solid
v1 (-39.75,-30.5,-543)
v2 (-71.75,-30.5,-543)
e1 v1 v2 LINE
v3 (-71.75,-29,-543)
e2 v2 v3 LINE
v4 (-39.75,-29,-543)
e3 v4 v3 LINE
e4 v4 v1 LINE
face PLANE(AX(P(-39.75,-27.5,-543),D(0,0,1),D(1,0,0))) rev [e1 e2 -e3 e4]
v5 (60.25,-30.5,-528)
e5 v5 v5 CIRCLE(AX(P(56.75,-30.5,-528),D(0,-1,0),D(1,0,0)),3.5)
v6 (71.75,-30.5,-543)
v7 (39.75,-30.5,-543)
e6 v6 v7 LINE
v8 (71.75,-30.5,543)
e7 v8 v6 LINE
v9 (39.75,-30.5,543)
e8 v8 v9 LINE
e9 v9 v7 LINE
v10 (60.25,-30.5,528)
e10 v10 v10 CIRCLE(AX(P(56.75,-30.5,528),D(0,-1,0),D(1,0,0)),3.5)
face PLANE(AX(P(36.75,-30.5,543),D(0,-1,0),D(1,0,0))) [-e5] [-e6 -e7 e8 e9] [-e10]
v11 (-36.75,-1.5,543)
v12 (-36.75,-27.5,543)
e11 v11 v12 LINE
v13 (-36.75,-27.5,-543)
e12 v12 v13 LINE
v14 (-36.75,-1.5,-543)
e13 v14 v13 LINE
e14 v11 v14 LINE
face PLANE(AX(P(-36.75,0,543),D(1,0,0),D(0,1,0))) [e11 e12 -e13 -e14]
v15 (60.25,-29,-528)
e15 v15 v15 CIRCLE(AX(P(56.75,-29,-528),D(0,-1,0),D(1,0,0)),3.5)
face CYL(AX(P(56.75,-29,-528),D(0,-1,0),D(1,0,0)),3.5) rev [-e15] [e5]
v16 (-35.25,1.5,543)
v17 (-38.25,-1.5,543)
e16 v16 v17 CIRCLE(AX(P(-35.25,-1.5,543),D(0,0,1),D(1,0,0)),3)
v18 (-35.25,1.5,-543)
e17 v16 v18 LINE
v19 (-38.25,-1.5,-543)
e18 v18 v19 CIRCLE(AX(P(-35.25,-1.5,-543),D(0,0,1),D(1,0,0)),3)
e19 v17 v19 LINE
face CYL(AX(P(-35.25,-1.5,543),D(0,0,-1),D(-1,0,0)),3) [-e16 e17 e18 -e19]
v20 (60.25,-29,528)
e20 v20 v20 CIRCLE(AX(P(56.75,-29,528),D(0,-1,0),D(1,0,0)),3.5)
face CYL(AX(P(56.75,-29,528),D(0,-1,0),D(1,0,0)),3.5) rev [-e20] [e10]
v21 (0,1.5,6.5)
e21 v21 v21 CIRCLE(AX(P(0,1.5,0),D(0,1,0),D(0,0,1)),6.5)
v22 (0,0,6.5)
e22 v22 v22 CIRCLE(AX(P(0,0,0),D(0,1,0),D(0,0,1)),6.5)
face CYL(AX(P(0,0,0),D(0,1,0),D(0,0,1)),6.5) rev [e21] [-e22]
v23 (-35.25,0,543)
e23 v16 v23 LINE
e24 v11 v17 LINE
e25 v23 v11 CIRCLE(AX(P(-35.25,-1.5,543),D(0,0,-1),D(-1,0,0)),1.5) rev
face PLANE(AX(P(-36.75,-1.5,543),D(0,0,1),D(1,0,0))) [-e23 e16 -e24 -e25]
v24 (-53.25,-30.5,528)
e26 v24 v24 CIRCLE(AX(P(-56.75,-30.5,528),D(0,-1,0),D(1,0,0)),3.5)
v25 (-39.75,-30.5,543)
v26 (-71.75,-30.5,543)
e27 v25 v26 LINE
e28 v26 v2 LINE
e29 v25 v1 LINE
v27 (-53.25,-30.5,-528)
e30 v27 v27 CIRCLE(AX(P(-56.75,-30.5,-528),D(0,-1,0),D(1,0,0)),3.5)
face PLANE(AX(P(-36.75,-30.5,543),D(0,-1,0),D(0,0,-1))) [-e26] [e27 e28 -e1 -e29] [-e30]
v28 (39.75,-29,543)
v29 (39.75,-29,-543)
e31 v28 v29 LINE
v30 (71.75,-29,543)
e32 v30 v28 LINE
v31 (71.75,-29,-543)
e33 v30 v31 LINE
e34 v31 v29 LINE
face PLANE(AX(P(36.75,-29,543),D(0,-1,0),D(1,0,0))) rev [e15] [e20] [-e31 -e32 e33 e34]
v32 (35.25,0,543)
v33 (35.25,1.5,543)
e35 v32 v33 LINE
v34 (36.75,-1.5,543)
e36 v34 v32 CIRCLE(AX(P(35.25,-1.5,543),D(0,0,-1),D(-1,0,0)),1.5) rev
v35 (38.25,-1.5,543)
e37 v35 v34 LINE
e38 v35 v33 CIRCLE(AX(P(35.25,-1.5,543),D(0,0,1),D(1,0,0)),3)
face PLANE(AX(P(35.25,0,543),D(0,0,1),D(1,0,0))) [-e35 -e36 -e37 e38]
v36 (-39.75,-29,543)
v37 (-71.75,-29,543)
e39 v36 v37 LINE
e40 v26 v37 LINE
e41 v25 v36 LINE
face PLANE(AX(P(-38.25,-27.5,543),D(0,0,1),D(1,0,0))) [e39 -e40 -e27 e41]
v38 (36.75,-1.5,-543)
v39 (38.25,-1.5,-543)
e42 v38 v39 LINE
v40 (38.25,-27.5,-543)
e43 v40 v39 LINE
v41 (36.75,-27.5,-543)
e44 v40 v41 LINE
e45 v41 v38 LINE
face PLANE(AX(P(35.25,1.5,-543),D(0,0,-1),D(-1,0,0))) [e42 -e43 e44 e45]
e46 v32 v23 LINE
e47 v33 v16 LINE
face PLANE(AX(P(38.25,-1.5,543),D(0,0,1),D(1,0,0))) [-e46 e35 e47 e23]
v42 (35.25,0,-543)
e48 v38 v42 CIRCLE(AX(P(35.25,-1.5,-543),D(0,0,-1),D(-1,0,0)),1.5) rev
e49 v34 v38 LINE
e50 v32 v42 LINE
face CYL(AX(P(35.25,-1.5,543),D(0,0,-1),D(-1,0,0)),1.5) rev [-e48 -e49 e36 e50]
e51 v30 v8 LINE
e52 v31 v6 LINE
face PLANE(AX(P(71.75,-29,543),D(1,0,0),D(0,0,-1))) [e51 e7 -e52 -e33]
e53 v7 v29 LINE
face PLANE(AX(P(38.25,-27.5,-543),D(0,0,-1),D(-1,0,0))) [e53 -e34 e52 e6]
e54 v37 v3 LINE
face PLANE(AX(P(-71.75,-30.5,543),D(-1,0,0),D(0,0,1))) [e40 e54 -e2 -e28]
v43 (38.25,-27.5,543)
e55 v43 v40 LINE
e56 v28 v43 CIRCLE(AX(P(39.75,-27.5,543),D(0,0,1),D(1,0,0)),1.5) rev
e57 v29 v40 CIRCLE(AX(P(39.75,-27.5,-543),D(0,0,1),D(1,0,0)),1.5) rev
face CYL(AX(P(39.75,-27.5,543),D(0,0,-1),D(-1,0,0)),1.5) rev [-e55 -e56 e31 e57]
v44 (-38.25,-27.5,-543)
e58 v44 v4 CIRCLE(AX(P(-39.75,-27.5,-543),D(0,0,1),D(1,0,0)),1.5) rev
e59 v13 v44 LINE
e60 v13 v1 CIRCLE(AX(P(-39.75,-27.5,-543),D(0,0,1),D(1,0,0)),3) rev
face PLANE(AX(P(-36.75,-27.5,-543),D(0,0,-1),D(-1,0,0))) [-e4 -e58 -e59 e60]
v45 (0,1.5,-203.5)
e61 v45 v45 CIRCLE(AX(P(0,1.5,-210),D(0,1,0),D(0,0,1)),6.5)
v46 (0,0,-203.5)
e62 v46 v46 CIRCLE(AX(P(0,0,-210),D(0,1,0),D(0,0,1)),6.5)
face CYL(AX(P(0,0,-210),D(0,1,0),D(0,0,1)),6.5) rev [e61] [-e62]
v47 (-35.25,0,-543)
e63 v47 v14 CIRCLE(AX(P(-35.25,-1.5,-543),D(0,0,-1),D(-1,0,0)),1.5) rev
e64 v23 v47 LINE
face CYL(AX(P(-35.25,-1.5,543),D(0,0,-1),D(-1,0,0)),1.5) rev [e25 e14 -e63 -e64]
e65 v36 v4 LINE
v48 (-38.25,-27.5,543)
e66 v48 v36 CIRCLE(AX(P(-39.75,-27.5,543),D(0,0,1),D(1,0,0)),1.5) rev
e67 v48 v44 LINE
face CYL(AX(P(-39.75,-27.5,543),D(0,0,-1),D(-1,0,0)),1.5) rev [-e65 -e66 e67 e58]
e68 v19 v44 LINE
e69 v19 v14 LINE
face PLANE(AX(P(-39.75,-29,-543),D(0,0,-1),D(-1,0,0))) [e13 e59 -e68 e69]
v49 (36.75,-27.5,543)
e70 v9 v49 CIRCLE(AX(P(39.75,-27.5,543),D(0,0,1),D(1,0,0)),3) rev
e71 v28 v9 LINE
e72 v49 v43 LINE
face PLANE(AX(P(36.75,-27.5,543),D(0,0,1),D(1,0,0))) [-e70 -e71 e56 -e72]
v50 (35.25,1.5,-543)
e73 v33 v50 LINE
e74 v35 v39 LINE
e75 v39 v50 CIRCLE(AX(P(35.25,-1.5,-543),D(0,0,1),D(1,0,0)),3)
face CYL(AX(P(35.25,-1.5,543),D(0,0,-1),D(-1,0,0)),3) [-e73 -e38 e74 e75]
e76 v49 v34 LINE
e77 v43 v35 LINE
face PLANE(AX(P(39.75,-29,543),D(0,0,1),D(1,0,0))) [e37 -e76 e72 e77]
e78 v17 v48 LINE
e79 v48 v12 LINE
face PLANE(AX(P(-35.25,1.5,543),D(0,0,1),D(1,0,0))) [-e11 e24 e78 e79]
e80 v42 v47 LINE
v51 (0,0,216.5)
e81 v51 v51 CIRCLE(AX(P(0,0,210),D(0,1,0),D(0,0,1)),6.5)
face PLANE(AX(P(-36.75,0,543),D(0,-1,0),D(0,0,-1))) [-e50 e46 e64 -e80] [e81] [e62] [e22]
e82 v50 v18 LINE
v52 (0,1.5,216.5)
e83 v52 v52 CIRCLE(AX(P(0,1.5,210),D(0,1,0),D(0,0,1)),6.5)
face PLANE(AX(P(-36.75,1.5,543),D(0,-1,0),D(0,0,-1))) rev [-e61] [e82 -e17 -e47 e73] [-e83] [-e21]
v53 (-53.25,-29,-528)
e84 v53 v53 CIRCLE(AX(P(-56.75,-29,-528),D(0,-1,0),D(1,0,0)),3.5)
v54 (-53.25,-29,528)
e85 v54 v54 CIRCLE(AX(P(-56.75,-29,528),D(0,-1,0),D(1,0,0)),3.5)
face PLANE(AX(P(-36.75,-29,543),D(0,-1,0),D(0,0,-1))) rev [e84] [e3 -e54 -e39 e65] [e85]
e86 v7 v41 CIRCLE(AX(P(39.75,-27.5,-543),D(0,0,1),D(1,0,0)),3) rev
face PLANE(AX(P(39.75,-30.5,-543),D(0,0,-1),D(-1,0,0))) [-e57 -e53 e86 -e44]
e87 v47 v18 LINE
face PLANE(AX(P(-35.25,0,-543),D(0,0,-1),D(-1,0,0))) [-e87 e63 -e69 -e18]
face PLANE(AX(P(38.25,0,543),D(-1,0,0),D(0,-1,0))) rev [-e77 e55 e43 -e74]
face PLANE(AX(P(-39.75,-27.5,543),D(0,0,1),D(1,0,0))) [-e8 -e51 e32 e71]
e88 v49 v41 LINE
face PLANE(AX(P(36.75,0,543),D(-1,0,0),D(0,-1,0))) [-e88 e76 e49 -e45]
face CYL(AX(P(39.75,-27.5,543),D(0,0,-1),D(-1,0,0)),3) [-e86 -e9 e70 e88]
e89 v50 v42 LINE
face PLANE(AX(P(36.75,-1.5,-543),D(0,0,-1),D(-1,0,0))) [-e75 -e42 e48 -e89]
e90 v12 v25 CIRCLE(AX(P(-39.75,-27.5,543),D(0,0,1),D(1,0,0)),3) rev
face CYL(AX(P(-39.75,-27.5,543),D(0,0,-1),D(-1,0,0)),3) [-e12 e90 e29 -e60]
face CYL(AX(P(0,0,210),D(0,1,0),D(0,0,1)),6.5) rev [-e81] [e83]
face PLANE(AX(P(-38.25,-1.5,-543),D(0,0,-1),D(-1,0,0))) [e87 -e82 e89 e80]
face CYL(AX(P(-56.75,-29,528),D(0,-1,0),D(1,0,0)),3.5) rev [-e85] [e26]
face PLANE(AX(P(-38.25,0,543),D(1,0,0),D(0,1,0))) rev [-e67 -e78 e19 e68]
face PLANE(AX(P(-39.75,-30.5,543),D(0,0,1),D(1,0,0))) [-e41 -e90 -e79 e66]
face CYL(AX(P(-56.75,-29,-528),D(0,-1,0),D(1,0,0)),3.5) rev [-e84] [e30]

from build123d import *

# Parameters (mm, degrees)
SM_BASE_FLANGE_1_DEPTH = 543
SKETCH_7_R             = 3.5
CUT_EXTRUDE_2_DEPTH    = 10
SKETCH_8_R             = 6.5
CUT_EXTRUDE_3_DEPTH    = 10


# Sheet-metal steps are written as plain solids
with BuildPart() as part:
    # Sketch 1 → Базовая кромка1 (new, symmetric)
    with BuildSketch(Plane.XY):
        with BuildLine():
            Line((-71.75, -30.5), (-39.75, -30.5))
            ThreePointArc((-39.75, -30.5), (-37.628679656, -29.621320344), (-36.75, -27.5))
            Line((-36.75, -27.5), (-36.75, -1.5))
            ThreePointArc((-36.75, -1.5), (-36.310660172, -0.439339828), (-35.25, 0))
            Line((-35.25, 0), (35.25, 0))
            ThreePointArc((35.25, 0), (36.310660172, -0.439339828), (36.75, -1.5))
            Line((36.75, -1.5), (36.75, -27.5))
            ThreePointArc((36.75, -27.5), (37.628679656, -29.621320344), (39.75, -30.5))
            Line((39.75, -30.5), (71.75, -30.5))
            Line((71.75, -30.5), (71.75, -29))
            Line((71.75, -29), (39.75, -29))
            ThreePointArc((39.75, -29), (38.689339828, -28.560660172), (38.25, -27.5))
            Line((38.25, -27.5), (38.25, -1.5))
            ThreePointArc((38.25, -1.5), (37.371320344, 0.621320344), (35.25, 1.5))
            Line((35.25, 1.5), (-35.25, 1.5))
            ThreePointArc((-35.25, 1.5), (-37.371320344, 0.621320344), (-38.25, -1.5))
            Line((-38.25, -1.5), (-38.25, -27.5))
            ThreePointArc((-38.25, -27.5), (-38.689339828, -28.560660172), (-39.75, -29))
            Line((-39.75, -29), (-71.75, -29))
            Line((-71.75, -29), (-71.75, -30.5))
        make_face()
    extrude(amount=SM_BASE_FLANGE_1_DEPTH, both=True)

    # Эскиз7 → Вырез-Вытянуть2 (cut)
    with BuildSketch(Plane.XZ.offset(30.5)):
        with Locations((56.75, 528)):
            Circle(SKETCH_7_R)
        with Locations((-56.75, 528)):
            Circle(SKETCH_7_R)
        with Locations((56.75, -528)):
            Circle(SKETCH_7_R)
        with Locations((-56.75, -528)):
            Circle(SKETCH_7_R)
    extrude(amount=-CUT_EXTRUDE_2_DEPTH, mode=Mode.SUBTRACT)

    # Эскиз8 → Вырез-Вытянуть3 (cut)
    with BuildSketch(Plane(origin=(0, 1.5, 0), x_dir=(1, 0, 0), z_dir=(0, 1, 0))):
        with Locations(Location((0, 210, 0), (0, 0, 270))):
            Circle(SKETCH_8_R)
        with Locations(Location((0, 0, 0), (0, 0, 270))):
            Circle(SKETCH_8_R)
        with Locations(Location((0, -210, 0), (0, 0, 270))):
            Circle(SKETCH_8_R)
    extrude(amount=-CUT_EXTRUDE_3_DEPTH, mode=Mode.SUBTRACT)


solid = part.part
